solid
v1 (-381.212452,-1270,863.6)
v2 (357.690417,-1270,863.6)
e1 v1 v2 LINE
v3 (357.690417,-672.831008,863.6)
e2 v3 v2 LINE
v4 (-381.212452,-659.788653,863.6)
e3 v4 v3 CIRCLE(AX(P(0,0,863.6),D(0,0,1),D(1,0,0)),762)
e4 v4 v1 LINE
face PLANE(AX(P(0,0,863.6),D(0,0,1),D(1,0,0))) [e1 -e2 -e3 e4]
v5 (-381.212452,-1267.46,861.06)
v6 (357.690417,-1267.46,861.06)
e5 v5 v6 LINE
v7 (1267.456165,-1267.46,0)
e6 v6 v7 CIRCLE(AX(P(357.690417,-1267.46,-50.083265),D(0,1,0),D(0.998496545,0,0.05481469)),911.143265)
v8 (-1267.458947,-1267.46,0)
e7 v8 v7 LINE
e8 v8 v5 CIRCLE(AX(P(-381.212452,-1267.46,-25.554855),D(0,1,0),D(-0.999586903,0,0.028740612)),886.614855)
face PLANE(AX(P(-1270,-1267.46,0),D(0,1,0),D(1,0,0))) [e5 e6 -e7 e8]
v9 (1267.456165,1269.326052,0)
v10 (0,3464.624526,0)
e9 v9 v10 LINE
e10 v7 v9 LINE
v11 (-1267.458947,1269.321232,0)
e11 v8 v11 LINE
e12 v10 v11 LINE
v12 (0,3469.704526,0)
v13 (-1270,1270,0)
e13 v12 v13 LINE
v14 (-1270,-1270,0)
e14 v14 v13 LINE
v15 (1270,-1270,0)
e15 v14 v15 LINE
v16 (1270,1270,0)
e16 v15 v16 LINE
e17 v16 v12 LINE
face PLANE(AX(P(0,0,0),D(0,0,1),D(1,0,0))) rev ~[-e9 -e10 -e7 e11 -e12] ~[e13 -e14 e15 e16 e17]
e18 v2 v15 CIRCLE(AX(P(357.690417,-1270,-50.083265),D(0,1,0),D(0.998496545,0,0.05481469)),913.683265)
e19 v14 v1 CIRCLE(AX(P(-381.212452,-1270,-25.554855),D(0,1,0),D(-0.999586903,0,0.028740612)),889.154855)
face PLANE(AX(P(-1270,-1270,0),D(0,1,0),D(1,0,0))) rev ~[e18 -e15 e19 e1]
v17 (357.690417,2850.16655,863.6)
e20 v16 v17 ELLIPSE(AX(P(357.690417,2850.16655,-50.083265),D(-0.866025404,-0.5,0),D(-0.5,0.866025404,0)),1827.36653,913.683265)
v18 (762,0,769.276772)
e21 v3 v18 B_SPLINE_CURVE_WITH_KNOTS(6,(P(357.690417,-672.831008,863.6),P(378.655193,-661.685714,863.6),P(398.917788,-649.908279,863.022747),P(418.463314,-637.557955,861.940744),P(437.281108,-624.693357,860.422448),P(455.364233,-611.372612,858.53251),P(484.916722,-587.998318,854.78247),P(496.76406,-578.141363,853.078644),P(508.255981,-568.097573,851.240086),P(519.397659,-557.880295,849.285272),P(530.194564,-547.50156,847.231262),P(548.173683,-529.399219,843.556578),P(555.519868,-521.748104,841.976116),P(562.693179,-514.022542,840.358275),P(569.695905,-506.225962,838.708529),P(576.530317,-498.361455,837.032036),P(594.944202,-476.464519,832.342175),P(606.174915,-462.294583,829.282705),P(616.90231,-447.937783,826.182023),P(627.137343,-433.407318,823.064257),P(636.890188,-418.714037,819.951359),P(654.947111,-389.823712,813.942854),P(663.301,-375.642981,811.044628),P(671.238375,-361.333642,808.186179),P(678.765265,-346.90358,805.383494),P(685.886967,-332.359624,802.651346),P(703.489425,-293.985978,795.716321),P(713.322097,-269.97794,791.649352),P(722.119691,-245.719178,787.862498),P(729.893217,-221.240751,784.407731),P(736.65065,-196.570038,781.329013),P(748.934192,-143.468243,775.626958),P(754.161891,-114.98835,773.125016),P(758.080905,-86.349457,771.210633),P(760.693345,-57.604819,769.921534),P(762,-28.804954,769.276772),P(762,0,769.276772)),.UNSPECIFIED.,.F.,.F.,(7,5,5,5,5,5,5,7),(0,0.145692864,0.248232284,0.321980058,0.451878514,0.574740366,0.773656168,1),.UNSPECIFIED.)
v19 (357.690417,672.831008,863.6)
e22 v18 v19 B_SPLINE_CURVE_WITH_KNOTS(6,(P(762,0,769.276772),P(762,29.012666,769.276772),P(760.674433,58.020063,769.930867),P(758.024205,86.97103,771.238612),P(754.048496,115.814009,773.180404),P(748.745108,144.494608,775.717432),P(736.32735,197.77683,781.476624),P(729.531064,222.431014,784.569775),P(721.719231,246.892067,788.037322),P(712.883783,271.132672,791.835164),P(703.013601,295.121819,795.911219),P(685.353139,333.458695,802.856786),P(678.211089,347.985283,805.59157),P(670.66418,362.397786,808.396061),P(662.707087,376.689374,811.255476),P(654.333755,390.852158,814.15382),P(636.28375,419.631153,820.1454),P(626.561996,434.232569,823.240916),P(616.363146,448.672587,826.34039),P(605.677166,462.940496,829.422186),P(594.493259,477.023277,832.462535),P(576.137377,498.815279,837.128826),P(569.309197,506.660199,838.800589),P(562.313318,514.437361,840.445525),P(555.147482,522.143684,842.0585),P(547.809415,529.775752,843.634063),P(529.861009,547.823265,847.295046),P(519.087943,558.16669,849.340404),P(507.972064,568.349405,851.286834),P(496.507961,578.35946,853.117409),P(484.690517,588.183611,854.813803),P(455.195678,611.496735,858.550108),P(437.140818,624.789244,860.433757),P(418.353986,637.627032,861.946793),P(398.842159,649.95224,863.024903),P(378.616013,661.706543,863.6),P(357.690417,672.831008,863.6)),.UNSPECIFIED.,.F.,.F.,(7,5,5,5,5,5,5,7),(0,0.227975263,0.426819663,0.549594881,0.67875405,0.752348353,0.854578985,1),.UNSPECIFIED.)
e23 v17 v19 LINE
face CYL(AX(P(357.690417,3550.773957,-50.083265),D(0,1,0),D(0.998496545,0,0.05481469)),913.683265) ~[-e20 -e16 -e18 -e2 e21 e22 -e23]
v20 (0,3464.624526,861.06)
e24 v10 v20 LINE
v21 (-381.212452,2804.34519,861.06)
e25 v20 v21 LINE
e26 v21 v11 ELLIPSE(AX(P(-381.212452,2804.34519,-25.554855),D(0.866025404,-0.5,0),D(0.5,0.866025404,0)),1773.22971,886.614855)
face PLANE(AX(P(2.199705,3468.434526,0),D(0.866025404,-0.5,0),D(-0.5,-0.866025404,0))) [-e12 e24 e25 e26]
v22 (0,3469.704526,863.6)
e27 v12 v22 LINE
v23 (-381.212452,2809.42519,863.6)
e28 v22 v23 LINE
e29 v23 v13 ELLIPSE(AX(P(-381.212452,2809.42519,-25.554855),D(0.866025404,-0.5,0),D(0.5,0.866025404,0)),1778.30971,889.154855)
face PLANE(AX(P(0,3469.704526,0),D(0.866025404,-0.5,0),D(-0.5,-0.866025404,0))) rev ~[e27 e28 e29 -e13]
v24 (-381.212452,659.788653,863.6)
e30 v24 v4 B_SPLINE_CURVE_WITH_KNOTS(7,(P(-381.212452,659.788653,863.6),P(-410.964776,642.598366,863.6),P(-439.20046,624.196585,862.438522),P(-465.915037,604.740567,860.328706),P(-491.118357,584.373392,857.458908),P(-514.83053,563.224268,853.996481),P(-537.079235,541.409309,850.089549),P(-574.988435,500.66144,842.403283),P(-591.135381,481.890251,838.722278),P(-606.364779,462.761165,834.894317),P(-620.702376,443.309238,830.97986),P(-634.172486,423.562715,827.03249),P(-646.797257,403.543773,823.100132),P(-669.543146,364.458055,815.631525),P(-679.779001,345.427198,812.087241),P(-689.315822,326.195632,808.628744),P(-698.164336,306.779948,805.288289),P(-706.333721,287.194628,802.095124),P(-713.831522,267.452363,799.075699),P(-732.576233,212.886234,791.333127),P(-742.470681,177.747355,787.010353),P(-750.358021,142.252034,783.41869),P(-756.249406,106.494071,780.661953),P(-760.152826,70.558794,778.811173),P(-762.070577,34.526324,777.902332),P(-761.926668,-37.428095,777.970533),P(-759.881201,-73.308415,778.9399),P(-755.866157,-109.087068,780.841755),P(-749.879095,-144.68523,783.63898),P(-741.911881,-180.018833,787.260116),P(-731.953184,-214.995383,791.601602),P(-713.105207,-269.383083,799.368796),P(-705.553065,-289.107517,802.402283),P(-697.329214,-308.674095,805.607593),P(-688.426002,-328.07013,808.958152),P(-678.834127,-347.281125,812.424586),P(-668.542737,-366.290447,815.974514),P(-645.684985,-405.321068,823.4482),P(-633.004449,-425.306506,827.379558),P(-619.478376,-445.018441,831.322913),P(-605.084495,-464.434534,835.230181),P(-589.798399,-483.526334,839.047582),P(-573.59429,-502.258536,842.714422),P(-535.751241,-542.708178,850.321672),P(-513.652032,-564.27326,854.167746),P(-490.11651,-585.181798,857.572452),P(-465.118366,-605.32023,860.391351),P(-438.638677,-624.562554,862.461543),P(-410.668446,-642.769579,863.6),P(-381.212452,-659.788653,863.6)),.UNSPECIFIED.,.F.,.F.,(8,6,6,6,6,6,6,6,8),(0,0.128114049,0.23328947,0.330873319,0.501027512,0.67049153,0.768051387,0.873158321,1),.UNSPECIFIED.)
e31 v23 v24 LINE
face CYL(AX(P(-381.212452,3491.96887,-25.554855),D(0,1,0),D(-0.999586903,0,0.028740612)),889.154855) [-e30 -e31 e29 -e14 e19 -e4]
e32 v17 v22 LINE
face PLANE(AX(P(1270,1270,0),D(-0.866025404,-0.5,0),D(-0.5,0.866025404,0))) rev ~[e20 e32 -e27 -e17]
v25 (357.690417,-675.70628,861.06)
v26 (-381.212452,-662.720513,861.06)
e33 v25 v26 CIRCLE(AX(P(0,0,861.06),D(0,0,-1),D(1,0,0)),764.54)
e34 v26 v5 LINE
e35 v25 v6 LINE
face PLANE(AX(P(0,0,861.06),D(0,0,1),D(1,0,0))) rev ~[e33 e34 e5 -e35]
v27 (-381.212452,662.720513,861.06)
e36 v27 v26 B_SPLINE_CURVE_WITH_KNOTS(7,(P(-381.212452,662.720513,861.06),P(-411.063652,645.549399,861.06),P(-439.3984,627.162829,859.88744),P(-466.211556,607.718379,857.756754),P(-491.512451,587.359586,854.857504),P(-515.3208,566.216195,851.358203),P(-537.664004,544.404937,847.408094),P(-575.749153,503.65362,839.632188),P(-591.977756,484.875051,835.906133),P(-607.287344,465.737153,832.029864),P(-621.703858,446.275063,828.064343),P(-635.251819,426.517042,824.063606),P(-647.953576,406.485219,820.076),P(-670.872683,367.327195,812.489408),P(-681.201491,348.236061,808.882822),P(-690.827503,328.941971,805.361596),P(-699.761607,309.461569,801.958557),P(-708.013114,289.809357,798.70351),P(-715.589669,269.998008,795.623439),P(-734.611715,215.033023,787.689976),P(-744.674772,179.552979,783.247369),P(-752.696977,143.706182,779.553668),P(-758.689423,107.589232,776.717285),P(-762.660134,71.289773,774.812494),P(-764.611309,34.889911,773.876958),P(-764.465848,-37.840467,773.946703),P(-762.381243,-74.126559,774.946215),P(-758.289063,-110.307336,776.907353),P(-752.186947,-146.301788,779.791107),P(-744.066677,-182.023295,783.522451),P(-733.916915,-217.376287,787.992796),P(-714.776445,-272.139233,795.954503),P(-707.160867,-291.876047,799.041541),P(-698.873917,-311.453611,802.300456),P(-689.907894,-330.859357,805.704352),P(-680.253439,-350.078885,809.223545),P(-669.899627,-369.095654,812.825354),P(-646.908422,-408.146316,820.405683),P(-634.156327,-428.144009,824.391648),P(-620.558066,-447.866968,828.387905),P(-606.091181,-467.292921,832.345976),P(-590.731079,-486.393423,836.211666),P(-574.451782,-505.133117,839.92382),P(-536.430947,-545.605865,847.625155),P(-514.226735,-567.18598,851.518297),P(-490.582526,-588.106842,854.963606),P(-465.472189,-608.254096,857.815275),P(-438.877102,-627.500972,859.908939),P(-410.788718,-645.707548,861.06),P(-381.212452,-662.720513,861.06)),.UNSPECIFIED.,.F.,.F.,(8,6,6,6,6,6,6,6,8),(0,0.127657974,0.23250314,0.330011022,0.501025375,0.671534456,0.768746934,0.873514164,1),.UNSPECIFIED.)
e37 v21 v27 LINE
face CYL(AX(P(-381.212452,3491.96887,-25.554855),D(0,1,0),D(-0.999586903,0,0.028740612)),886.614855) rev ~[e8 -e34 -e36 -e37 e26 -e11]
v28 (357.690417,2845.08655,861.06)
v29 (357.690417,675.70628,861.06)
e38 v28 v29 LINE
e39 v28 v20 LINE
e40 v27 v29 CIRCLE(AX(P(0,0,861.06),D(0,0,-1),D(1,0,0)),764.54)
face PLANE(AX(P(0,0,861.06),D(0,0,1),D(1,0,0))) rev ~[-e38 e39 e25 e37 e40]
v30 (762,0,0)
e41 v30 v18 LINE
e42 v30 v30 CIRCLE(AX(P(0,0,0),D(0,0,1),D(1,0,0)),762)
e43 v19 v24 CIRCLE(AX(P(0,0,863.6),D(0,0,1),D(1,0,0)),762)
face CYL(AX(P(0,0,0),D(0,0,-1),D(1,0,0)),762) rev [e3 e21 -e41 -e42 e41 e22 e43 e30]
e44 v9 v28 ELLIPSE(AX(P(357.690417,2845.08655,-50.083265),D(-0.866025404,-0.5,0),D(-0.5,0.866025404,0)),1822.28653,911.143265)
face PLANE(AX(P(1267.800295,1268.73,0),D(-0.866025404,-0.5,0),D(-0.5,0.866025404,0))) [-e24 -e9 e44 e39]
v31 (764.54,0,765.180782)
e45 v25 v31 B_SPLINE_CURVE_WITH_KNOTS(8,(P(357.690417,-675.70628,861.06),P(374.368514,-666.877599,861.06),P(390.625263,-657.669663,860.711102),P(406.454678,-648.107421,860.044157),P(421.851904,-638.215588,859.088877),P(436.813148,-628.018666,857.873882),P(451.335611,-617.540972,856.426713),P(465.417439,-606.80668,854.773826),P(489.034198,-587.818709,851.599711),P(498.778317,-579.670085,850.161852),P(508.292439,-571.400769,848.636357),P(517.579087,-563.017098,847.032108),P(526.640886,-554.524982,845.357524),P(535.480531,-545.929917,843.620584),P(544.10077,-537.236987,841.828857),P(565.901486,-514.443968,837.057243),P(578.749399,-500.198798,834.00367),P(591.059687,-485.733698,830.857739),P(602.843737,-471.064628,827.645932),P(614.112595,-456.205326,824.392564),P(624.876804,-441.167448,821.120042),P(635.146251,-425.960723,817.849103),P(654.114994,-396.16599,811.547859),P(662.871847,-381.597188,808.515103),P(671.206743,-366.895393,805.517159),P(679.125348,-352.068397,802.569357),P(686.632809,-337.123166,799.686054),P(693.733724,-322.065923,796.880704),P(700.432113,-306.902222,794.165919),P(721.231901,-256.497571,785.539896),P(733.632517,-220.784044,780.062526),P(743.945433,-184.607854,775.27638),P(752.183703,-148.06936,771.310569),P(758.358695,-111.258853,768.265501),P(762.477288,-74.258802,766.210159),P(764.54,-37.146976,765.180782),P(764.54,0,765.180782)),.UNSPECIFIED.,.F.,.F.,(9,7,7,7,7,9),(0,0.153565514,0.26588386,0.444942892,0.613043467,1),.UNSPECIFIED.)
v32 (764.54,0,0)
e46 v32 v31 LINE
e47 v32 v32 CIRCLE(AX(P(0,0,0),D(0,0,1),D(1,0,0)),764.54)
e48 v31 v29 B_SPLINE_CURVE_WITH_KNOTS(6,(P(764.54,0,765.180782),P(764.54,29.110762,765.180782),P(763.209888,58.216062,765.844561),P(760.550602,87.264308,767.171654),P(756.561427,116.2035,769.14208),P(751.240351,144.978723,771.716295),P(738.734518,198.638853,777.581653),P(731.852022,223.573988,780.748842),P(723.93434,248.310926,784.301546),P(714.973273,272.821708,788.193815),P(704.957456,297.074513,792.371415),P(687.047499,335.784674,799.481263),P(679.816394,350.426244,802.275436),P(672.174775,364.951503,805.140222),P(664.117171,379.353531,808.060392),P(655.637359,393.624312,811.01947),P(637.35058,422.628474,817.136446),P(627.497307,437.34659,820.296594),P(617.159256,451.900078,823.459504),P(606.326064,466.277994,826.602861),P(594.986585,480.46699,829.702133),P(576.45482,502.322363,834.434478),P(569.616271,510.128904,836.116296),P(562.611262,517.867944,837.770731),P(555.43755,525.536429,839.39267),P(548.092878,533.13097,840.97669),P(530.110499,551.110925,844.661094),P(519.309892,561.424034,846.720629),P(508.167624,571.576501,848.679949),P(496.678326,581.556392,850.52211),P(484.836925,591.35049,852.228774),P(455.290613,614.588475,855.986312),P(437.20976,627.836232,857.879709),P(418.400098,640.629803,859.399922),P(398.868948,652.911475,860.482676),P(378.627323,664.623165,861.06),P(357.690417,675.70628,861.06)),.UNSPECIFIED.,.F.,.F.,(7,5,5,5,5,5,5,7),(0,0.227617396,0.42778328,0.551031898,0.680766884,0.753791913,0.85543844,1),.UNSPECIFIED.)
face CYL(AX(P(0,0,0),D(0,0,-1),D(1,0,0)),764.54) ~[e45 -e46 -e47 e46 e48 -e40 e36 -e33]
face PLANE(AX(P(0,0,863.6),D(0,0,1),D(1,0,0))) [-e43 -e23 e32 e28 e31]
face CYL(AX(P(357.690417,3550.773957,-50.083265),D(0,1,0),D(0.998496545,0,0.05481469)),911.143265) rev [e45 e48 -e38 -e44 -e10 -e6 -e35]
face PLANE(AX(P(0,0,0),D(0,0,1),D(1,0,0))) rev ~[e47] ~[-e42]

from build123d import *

# Parameters (mm, degrees)
F0_W        = 2540
F0_H        = 2540
F0_R        = 762
F1_DEPTH    = 863.6
F2_T1_DEPTH = 6983.9377403211
F3_T1_DEPTH = 7101.5479143316
F4_T        = -2.54


# Not quite as in the source:
# - a fillet or chamfer that OpenCascade refuses, or shapes differently, is made with other operations: its cross-section is extruded or revolved along the edge and cut away or added


with BuildPart() as f1:
    # F0 (on Top) → F1 (new body)
    with BuildSketch(Plane.XY):
        Rectangle(F0_W, F0_H)
        Circle(F0_R, mode=Mode.SUBTRACT)
        Polygon((0, 3469.7045256125), (-1270, 1270), (1270, 1270), align=None)
    extrude(amount=F1_DEPTH)

    # F2: fillet of radius 889.154855022 on 1 edges, made by hand

    # F2_s2 → F2_t1 (cut)
    with BuildSketch(Plane.XZ.offset(-3491.9688701606)):
        with BuildLine():
            ThreePointArc((-1270, 0), (-1000.8390059169, 612.1435766922), (-381.2124519358, 863.6))
            Line((-381.2124519358, 863.6), (-1270, 863.6))
            Line((-1270, 863.6), (-1270, 0))
        make_face()
    extrude(amount=F2_T1_DEPTH, mode=Mode.SUBTRACT)

    # F3: fillet of radius 913.6832648157 on 1 edges, made by hand

    # F3_s2 → F3_t1 (cut)
    with BuildSketch(Plane.XZ.offset(-3550.7739571658)):
        with BuildLine():
            ThreePointArc((1270, 0), (985.8054016289, 613.4592542868), (357.6904171337, 863.6))
            Line((357.6904171337, 863.6), (1270, 863.6))
            Line((1270, 863.6), (1270, 0))
        make_face()
    extrude(amount=F3_T1_DEPTH, mode=Mode.SUBTRACT)

    # F4
    f4_openings = [f1.faces().sort_by_distance(p)[0] for p in [
        (-1216.22603, 0, 0),
    ]]
    offset(amount=F4_T, openings=f4_openings)


solid = f1.part
